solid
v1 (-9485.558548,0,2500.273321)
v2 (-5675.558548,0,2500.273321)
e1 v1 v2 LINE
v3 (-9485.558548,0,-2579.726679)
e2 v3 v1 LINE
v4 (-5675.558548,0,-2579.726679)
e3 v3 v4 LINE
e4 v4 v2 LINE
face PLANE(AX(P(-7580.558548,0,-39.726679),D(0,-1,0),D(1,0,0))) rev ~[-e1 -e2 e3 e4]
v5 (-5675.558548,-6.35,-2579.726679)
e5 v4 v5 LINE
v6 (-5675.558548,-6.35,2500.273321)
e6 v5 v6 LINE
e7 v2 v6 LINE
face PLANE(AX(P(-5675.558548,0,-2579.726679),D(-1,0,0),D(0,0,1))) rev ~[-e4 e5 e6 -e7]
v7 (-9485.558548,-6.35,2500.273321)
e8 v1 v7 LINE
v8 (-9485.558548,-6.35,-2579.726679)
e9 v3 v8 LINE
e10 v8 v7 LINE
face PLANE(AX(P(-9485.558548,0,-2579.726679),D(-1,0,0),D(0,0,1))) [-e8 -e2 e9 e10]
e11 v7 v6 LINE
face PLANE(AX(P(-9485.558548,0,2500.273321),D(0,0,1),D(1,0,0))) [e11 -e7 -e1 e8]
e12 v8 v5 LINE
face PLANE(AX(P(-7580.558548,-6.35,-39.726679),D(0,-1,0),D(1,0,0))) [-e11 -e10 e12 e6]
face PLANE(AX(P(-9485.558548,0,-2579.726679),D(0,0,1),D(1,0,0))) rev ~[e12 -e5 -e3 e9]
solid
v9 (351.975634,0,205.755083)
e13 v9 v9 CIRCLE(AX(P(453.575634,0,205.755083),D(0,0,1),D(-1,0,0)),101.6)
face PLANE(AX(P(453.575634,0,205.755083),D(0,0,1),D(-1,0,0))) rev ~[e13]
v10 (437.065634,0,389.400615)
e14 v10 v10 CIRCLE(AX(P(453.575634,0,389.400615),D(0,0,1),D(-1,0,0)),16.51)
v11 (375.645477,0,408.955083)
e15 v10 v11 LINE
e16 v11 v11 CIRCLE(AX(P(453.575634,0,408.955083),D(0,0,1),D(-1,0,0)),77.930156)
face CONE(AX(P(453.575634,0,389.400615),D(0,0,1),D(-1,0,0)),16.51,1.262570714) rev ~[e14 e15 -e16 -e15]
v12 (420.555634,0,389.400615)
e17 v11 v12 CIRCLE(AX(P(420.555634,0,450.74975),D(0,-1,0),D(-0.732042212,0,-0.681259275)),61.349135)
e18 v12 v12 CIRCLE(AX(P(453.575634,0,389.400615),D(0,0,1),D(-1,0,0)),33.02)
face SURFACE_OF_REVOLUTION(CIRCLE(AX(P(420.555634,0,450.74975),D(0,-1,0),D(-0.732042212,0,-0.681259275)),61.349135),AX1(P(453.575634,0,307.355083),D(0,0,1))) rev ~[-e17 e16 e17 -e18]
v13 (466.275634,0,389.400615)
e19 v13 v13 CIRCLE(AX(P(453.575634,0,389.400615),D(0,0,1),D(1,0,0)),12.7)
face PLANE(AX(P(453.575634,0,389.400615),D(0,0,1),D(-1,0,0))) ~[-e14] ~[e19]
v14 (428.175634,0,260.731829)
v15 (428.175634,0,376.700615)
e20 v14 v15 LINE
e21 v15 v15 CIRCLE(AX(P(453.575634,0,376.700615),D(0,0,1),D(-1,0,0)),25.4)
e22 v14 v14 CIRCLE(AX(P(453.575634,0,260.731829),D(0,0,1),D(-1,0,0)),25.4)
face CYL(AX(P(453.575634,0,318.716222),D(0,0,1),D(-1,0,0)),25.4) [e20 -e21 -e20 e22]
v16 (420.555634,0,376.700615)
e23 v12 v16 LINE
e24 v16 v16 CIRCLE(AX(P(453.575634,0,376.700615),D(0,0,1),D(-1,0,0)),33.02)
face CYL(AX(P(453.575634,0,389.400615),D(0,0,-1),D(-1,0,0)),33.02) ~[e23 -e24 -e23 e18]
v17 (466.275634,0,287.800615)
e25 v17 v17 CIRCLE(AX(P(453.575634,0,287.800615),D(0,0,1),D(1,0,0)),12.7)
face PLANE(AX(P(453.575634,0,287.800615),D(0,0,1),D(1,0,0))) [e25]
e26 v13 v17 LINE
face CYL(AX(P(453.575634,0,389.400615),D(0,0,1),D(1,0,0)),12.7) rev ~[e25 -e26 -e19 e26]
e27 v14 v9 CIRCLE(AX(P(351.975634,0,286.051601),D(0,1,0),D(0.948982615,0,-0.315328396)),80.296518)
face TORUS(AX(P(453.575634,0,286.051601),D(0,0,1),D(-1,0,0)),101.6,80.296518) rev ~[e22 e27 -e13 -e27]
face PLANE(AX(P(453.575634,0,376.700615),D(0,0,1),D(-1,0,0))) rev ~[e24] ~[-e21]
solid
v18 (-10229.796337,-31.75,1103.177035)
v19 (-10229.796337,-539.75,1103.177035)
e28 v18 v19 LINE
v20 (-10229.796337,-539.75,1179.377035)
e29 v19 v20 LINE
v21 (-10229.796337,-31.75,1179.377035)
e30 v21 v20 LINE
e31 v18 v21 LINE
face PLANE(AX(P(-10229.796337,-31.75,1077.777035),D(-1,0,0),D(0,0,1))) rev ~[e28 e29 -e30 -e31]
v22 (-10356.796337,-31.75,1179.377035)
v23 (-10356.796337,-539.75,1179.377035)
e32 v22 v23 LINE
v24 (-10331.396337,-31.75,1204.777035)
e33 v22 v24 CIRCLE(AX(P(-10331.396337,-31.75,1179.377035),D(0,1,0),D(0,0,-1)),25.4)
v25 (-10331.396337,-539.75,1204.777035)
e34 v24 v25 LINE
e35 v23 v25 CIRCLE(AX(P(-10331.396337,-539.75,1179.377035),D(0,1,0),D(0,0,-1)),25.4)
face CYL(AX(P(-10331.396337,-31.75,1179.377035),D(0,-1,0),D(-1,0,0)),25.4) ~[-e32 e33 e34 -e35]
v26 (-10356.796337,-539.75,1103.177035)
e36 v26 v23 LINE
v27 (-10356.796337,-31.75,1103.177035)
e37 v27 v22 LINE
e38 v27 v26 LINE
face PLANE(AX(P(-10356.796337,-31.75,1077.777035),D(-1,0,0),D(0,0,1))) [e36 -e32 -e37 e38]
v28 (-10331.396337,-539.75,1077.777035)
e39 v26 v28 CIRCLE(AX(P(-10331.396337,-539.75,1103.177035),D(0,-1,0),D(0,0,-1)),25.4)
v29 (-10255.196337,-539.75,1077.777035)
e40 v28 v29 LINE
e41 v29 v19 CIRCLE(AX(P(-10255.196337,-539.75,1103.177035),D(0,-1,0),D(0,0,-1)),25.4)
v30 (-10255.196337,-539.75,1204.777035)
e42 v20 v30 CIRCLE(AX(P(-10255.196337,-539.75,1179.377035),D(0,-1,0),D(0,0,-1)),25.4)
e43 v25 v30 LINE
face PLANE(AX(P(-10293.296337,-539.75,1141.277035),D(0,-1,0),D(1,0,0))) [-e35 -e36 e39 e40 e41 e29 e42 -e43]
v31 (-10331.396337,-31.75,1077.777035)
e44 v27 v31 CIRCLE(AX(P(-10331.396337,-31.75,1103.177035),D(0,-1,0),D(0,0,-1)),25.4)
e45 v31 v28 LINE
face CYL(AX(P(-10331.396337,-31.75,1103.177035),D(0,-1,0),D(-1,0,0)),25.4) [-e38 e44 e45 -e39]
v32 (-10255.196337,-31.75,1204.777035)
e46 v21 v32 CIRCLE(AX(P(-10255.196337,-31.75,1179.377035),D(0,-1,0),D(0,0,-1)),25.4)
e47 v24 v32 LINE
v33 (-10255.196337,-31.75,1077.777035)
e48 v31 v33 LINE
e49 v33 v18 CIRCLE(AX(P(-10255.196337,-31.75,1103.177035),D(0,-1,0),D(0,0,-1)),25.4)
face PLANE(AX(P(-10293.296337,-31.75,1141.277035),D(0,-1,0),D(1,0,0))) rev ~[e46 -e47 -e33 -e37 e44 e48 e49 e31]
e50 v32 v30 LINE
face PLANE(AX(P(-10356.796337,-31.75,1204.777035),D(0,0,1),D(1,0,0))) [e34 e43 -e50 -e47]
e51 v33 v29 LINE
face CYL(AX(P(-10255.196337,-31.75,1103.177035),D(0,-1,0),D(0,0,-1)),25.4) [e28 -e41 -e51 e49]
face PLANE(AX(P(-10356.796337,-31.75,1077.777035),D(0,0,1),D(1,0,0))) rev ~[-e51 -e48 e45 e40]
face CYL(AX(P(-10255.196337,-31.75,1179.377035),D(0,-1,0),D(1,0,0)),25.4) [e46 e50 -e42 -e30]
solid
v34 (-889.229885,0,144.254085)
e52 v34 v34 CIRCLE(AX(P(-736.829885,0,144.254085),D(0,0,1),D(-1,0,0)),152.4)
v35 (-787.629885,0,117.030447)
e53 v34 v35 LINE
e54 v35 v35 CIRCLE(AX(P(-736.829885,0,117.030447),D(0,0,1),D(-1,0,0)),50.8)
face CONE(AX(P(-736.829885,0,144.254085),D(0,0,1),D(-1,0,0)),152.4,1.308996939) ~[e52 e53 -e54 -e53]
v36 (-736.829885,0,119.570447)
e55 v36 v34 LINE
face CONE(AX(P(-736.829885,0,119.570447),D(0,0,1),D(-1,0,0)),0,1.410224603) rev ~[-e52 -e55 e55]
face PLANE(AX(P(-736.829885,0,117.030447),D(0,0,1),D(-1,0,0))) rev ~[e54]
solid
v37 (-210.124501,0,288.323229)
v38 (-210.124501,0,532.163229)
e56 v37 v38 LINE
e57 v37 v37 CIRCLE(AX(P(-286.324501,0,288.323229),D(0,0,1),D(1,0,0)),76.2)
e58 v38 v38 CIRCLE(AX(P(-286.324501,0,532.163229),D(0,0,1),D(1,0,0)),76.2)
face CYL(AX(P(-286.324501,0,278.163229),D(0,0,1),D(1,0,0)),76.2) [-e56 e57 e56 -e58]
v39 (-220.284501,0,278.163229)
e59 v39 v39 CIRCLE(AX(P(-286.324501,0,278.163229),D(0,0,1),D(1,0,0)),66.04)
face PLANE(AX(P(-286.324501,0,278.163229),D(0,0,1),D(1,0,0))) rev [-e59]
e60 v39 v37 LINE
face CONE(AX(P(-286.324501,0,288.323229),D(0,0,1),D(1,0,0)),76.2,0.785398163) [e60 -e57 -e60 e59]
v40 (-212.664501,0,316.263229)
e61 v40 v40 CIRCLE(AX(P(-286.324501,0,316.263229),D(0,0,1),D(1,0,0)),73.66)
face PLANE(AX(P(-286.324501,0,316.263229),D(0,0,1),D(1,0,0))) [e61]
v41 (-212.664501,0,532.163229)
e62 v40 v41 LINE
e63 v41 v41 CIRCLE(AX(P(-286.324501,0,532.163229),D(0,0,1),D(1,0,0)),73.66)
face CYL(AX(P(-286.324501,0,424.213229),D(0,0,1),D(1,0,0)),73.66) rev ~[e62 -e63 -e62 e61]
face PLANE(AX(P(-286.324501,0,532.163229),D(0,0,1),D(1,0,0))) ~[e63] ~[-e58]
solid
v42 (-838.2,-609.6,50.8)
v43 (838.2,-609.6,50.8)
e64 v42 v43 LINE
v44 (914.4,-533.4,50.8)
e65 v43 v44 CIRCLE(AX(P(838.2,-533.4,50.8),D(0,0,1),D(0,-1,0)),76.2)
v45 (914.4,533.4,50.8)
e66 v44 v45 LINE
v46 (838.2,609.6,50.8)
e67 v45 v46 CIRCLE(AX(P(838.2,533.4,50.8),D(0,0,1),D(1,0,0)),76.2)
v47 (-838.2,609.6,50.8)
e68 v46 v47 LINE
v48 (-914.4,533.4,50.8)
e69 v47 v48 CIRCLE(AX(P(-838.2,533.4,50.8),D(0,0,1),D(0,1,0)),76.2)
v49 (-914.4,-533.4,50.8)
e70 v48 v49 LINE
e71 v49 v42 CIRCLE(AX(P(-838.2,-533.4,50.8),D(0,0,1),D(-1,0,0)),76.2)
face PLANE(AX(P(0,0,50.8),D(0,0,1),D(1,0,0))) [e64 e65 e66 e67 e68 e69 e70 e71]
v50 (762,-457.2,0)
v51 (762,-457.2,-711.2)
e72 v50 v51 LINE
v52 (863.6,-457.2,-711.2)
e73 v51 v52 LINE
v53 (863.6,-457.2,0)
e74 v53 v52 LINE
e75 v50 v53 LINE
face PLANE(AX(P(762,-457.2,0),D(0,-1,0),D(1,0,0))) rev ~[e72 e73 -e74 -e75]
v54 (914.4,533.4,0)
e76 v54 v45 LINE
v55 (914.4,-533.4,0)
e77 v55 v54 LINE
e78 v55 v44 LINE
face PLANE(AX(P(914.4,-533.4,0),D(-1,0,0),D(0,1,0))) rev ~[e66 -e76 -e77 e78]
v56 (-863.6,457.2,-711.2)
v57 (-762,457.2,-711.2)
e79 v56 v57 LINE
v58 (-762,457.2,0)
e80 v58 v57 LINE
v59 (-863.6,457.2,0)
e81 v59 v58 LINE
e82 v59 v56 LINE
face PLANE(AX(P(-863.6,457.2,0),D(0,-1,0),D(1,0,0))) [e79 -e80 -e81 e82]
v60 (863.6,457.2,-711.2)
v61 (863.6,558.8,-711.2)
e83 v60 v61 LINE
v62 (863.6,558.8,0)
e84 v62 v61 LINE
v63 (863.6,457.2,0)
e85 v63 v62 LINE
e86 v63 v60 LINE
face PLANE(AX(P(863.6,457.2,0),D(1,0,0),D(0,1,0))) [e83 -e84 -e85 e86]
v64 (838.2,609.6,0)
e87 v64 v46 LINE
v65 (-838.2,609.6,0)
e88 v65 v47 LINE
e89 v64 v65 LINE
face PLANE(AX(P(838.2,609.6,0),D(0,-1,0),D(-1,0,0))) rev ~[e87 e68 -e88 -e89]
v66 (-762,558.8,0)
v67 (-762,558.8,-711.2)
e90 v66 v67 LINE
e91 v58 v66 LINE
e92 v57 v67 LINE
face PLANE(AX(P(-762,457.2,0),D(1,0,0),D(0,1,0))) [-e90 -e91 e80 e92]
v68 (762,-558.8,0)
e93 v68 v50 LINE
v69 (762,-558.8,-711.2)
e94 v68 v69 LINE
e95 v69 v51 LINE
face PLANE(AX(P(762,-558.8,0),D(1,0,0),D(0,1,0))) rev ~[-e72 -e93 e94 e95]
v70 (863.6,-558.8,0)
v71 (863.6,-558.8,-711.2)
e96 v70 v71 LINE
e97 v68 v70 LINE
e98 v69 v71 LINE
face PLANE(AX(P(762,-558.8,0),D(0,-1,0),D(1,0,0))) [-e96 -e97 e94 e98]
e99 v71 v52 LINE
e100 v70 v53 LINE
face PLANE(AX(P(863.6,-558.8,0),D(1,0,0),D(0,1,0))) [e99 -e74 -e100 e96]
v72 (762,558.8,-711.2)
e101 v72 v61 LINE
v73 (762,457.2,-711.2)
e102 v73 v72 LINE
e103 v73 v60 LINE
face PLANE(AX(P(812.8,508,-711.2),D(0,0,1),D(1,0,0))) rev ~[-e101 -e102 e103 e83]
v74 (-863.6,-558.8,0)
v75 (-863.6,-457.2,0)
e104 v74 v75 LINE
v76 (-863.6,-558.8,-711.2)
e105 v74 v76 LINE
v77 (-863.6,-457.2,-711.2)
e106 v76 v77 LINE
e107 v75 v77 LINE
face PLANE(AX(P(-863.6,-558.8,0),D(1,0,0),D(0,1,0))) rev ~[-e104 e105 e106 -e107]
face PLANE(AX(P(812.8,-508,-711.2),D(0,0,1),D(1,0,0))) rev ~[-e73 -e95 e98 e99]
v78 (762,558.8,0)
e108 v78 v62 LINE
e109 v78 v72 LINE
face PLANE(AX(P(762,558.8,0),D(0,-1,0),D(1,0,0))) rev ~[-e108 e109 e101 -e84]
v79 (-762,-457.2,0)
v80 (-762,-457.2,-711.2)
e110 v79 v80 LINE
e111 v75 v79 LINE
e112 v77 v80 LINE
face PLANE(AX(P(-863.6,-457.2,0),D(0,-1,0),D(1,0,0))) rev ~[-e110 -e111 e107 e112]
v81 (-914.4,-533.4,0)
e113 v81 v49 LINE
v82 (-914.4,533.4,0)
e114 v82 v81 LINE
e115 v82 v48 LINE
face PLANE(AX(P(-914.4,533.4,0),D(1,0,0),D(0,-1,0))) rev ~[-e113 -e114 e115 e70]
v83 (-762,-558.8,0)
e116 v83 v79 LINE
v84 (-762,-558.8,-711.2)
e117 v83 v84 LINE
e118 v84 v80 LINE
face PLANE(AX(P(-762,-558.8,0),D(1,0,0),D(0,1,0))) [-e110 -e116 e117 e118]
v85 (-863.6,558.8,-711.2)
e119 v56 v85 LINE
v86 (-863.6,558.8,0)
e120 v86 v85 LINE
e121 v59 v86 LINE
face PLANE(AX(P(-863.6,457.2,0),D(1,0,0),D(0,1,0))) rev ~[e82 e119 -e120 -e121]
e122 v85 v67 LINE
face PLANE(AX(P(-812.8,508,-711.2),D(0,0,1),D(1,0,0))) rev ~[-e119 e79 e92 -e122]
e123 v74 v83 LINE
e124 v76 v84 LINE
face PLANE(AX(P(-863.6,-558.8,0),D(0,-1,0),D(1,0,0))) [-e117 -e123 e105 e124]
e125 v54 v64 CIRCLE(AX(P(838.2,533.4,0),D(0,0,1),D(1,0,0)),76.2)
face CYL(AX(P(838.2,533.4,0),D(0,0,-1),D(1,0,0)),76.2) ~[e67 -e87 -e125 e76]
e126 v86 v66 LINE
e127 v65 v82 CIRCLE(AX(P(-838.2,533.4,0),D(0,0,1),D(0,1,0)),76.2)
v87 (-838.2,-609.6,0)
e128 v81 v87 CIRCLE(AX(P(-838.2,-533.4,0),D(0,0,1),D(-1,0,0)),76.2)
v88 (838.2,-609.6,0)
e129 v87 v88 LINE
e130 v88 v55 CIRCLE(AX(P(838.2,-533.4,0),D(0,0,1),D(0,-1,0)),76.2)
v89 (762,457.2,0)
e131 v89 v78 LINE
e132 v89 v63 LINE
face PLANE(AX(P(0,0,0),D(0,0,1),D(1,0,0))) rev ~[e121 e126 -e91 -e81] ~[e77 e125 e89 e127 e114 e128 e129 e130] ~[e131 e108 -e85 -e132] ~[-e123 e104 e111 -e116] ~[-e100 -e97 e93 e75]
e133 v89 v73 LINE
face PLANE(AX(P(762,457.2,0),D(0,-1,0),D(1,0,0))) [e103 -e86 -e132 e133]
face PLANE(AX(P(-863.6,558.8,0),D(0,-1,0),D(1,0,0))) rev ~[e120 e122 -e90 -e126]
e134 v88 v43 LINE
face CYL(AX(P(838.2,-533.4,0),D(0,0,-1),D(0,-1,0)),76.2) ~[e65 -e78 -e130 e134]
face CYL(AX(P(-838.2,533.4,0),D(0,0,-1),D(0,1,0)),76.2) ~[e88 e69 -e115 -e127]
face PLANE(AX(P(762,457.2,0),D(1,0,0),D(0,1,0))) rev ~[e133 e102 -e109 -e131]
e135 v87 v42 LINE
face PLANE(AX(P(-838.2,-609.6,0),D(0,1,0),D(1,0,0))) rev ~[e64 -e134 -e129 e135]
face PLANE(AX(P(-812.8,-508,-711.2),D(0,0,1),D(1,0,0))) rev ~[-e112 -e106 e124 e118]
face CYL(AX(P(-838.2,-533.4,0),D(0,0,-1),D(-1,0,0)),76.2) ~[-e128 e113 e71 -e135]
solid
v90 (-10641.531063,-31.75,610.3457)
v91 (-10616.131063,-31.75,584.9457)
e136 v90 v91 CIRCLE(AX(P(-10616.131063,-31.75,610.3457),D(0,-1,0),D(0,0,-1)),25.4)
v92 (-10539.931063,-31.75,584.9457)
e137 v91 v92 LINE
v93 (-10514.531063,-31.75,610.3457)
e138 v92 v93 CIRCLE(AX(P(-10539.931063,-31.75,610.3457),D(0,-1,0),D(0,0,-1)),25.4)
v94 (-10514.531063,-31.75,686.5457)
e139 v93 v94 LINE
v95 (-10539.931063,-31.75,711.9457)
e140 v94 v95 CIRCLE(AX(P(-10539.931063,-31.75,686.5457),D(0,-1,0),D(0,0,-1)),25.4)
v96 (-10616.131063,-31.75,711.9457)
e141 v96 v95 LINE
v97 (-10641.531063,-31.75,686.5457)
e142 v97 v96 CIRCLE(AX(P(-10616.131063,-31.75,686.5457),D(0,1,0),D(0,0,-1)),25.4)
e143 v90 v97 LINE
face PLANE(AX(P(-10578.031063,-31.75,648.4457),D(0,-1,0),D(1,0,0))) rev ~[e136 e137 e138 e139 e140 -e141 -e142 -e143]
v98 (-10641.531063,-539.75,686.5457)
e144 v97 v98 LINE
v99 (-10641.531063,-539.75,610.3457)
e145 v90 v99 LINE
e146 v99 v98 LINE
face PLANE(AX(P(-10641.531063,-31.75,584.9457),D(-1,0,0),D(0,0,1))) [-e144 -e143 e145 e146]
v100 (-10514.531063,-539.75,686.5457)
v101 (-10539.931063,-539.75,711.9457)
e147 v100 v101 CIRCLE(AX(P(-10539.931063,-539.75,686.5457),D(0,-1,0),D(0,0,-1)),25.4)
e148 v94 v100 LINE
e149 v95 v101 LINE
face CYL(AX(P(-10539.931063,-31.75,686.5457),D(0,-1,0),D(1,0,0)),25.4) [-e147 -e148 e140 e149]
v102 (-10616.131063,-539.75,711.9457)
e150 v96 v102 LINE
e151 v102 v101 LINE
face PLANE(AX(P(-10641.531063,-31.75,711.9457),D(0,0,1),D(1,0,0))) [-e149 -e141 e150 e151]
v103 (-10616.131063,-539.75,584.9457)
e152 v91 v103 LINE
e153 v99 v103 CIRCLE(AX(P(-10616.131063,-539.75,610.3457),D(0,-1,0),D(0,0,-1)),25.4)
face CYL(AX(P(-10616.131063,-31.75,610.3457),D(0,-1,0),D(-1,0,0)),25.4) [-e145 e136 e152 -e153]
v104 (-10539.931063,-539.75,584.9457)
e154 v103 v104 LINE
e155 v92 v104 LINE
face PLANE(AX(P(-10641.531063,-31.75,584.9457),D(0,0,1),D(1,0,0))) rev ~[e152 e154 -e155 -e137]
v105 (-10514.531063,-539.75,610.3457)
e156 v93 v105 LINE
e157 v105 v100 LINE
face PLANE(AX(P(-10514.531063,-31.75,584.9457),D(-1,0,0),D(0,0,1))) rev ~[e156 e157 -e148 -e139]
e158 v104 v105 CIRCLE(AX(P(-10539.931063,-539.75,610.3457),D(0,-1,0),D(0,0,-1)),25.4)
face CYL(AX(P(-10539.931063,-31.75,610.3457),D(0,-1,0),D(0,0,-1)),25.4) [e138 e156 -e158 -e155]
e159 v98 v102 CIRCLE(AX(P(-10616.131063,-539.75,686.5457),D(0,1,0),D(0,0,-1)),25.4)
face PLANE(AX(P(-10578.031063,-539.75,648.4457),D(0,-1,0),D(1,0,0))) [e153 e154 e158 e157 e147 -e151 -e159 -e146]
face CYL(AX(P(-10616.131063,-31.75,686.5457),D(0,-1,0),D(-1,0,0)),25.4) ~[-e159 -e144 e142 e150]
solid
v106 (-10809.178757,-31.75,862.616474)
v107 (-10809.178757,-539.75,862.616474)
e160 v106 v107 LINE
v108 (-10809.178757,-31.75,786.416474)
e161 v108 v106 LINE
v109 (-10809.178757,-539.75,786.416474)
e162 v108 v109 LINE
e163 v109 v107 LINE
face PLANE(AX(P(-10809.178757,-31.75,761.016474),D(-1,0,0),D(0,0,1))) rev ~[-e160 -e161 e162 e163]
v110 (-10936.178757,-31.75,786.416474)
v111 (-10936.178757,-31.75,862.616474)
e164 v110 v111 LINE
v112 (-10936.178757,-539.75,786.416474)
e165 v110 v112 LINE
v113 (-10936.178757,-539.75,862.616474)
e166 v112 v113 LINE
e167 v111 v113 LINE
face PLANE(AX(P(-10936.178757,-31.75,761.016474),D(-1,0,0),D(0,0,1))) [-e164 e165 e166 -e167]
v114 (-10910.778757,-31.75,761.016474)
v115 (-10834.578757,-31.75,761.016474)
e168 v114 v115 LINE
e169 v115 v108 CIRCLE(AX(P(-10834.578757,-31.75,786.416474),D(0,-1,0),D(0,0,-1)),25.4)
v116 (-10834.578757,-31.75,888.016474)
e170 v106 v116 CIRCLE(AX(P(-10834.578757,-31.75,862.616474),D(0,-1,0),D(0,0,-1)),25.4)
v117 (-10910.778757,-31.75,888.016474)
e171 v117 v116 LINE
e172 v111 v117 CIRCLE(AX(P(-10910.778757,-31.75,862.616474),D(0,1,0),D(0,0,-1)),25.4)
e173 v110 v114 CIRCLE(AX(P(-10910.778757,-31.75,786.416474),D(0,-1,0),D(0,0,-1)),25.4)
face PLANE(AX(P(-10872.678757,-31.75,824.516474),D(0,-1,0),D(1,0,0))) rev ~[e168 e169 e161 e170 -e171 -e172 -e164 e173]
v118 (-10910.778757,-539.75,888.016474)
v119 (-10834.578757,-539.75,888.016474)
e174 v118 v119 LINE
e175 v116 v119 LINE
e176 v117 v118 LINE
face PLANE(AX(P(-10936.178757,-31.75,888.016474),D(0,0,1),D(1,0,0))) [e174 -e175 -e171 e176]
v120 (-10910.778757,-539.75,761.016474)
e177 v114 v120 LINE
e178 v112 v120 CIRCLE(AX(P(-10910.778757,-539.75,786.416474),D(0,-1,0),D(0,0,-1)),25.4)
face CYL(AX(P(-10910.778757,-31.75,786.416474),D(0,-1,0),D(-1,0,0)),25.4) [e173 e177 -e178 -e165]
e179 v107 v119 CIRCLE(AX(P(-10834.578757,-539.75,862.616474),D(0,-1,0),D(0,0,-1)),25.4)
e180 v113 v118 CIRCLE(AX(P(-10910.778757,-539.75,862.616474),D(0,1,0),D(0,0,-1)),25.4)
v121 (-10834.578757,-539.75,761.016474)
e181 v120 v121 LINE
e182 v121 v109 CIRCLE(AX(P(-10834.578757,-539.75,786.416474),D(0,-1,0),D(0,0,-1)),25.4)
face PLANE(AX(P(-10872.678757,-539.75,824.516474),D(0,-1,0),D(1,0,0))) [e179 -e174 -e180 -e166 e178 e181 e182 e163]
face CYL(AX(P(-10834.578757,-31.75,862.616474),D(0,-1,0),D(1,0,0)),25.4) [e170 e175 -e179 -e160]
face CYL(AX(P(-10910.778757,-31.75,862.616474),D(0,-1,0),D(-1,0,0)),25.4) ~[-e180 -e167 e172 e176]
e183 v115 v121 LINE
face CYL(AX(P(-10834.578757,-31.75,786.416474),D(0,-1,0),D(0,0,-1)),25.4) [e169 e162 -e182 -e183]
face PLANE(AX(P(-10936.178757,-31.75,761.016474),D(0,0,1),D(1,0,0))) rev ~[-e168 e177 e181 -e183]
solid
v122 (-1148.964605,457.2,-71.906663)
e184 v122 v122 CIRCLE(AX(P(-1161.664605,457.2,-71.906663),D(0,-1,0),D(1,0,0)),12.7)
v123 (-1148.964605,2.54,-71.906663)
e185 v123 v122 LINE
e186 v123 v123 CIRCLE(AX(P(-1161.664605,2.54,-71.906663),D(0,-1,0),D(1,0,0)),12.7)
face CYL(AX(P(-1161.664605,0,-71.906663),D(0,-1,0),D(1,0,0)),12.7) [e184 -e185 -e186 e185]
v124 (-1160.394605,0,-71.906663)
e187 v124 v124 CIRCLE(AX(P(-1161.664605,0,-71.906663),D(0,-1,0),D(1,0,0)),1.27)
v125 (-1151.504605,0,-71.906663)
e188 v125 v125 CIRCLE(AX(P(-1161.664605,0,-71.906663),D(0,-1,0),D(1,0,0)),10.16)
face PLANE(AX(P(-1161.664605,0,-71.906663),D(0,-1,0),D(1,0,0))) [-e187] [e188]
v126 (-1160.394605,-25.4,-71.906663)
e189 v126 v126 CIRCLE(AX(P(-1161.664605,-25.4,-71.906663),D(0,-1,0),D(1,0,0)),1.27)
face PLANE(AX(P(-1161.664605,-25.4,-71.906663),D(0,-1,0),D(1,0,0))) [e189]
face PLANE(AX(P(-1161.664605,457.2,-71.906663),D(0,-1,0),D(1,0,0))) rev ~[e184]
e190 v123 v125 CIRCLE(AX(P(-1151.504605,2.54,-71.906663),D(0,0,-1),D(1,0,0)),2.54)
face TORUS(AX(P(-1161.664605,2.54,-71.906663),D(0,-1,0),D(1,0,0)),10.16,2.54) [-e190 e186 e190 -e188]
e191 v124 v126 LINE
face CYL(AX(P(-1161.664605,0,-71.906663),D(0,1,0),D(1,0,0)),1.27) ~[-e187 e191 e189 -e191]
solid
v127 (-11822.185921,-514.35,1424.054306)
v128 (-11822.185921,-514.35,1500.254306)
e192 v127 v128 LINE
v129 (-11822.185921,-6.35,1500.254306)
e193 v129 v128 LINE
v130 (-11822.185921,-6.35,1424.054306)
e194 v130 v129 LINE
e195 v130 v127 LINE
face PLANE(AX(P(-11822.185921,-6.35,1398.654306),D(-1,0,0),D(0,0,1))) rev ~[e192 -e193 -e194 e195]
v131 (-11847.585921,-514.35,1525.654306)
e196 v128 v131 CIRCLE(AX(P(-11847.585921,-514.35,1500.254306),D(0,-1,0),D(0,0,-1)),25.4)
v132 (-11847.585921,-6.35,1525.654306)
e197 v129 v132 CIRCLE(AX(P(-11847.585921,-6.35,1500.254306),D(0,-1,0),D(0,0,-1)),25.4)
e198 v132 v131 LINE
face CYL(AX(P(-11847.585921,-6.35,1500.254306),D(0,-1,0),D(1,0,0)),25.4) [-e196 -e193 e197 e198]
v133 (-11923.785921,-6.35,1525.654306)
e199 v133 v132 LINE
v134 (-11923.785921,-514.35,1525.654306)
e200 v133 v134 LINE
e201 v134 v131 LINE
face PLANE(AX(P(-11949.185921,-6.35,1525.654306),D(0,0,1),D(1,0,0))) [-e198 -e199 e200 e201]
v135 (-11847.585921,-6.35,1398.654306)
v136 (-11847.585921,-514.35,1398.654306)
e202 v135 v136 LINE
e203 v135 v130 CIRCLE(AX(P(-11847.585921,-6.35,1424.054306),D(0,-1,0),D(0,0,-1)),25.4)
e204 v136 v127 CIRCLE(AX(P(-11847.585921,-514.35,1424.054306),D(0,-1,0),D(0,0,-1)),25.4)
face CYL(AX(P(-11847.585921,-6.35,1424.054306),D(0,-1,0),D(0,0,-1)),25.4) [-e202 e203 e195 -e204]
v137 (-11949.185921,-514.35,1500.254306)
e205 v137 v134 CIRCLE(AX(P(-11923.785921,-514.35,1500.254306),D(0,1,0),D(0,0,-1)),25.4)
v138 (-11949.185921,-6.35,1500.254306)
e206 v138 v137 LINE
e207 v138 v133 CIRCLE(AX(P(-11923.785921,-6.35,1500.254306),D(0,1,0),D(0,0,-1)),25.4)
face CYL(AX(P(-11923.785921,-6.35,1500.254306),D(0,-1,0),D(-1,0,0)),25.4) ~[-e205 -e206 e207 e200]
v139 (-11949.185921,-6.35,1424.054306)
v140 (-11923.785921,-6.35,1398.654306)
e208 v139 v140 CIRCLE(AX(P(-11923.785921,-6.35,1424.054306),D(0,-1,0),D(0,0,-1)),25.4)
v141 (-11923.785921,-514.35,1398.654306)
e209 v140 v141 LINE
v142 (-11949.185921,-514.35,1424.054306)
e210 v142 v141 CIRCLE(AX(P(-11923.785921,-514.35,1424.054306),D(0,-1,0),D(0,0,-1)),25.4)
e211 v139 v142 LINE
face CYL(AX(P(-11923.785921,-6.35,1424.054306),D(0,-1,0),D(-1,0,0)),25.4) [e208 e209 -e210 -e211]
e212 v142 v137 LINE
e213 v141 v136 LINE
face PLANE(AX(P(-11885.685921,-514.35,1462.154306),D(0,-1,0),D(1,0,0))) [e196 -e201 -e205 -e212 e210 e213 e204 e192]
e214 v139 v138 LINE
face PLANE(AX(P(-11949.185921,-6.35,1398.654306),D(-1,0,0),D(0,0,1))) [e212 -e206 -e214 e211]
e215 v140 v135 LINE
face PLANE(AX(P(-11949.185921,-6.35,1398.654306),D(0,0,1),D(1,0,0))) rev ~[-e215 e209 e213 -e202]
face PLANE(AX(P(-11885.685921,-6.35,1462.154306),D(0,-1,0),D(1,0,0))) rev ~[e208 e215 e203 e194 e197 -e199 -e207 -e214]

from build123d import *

# Parameters (mm, degrees)
F0_W      = 101.6
F0_H      = 101.6
F1_DEPTH  = 50.8
F2_DEPTH  = 711.2
F3_W      = 2.54
F3_H      = 215.9
F5_SIZE   = 10.16
F8_R      = 12.7
F8_R_2    = 1.27
F9_DEPTH  = 457.2
F10_DEPTH = 25.4
F11_R     = 2.54
F12_W     = 25.4
F12_H     = 115.9687861614
F14_R     = 12.7
F15_DEPTH = 101.6
F16_W     = 3810
F16_H     = 5080
F17_DEPTH = 6.35
F19_W     = 127
F19_H     = 127
F20_DEPTH = 508
F21_R     = 25.4
F22_W     = 127
F22_H     = 127
F23_DEPTH = 508
F25_W     = 127
F25_H     = 127
F26_DEPTH = 508
F27_R     = 25.4
F28_W     = 127
F28_H     = 127
F29_DEPTH = 508
F30_R     = 25.4
F30_2_R   = 25.4


# Not quite as in the source:
# - a feature of the source that left no trace in its solid (it failed there, or was rolled back) is left out


with BuildPart() as f1:
    # F0 (on Top) → F1 (new body)
    with BuildSketch(Plane.XY):
        with BuildLine():
            Line((838.2, 609.6), (-838.2, 609.6))
            ThreePointArc((-838.2, 609.6), (-892.0815367264, 587.2815367264), (-914.4, 533.4))
            Line((-914.4, 533.4), (-914.4, -533.4))
            ThreePointArc((-914.4, -533.4), (-892.0815367264, -587.2815367264), (-838.2, -609.6))
            Line((-838.2, -609.6), (838.2, -609.6))
            ThreePointArc((838.2, -609.6), (892.0815367264, -587.2815367264), (914.4, -533.4))
            Line((914.4, -533.4), (914.4, 533.4))
            ThreePointArc((914.4, 533.4), (892.0815367264, 587.2815367264), (838.2, 609.6))
        make_face()
        with Locations((-812.8, -508)):
            Rectangle(F0_W, F0_H, mode=Mode.SUBTRACT)
        with Locations((812.8, -508)):
            Rectangle(F0_W, F0_H, mode=Mode.SUBTRACT)
        with Locations((-812.8, 508)):
            Rectangle(F0_W, F0_H, mode=Mode.SUBTRACT)
        with Locations((812.8, 508)):
            Rectangle(F0_W, F0_H, mode=Mode.SUBTRACT)
        with Locations((-812.8, -508)):
            Rectangle(F0_W, F0_H)
        with Locations((812.8, -508)):
            Rectangle(F0_W, F0_H)
        with Locations((812.8, 508)):
            Rectangle(F0_W, F0_H)
        with Locations((-812.8, 508)):
            Rectangle(F0_W, F0_H)
    extrude(amount=F1_DEPTH)

    # F0 (on Top) → F2 (join)
    with BuildSketch(Plane.XY):
        with Locations((-812.8, -508)):
            Rectangle(F0_W, F0_H)
        with Locations((-812.8, 508)):
            Rectangle(F0_W, F0_H)
        with Locations((812.8, 508)):
            Rectangle(F0_W, F0_H)
        with Locations((812.8, -508)):
            Rectangle(F0_W, F0_H)
    extrude(amount=-F2_DEPTH)


with BuildPart() as f4:
    # F3 (on Front) → F4 (revolve)
    with BuildSketch(Plane.XZ):
        Polygon((-286.3245010376, 316.2632285118), (-286.3245010376, 278.1632285118), (-210.1245010376, 278.1632285118), (-210.1245010376, 316.2632285118), (-212.6645010376, 316.2632285118), align=None)
        with Locations((-211.3945010376, 424.2132285118)):
            Rectangle(F3_W, F3_H)
    revolve(axis=Axis((-286.3245010376, 0, 405.1632285118), (0, 0, 1)))

    # F5
    f5_edges = [f4.edges().sort_by_distance(p)[0] for p in [
        (-362.524501, 0, 278.163229),
    ]]
    chamfer(f5_edges, length=F5_SIZE)


with BuildPart() as f7:
    # F6 (on Front) → F7 (revolve)
    with BuildSketch(Plane.XZ):
        Polygon((-787.6298852921, 117.0304474873), (-736.8298852921, 117.0304474873), (-736.8298852921, 119.5704474873), (-889.2298852921, 144.2540854383), align=None)
    revolve(axis=Axis((-736.8298852921, 0, 187.9355122422), (0, 0, 1)))


with BuildPart() as f9:
    # F8 (on Front) → F9 (new body)
    with BuildSketch(Plane.XZ):
        with Locations((-1161.6646051407, -71.9066634774)):
            Circle(F8_R)
        with Locations((-1161.6646051407, -71.9066634774)):
            Circle(F8_R_2, mode=Mode.SUBTRACT)
        with Locations((-1161.6646051407, -71.9066634774)):
            Circle(F8_R_2)
    extrude(amount=-F9_DEPTH)

    # F8 (on Front) → F10 (join)
    with BuildSketch(Plane.XZ):
        with Locations((-1161.6646051407, -71.9066634774)):
            Circle(F8_R_2)
    extrude(amount=F10_DEPTH)

    # F11
    f11_edges = [f9.edges().sort_by_distance(p)[0] for p in [
        (-1174.364605, 0, -71.906663),
    ]]
    fillet(f11_edges, radius=F11_R)


with BuildPart() as f13:
    # F12 (on Front) → F13 (revolve)
    with BuildSketch(Plane.XZ):
        Polygon((428.1756336873, 376.7006152139), (453.5756336873, 376.7006152139), (453.5756336873, 389.4006152139), (437.0656336873, 389.4006152139), (420.5556336873, 389.4006152139), (420.5556336873, 376.7006152139), align=None)
        with Locations((440.8756336873, 318.7162221332)):
            Rectangle(F12_W, F12_H)
        with BuildLine():
            Line((351.9756336873, 205.7550829578), (453.5756336873, 205.7550829578))
            Line((453.5756336873, 205.7550829578), (453.5756336873, 260.7318290524))
            Line((453.5756336873, 260.7318290524), (428.1756336873, 260.7318290524))
            ThreePointArc((428.1756336873, 260.7318290524), (398.9567006482, 220.9339369722), (351.9756336873, 205.7550829578))
        make_face()
        with BuildLine():
            Line((420.5556336873, 389.4006152139), (437.0656336873, 389.4006152139))
            Line((437.0656336873, 389.4006152139), (375.645477209, 408.9550829578))
            ThreePointArc((375.645477209, 408.9550829578), (396.0643119403, 394.5012700165), (420.5556336873, 389.4006152139))
        make_face()
    revolve(axis=Axis((453.5756336873, 0, 307.3550829578), (0, 0, 1)))

    # F14 (on face) → F15 (cut)
    with BuildSketch(Plane.XY.offset(389.4006152139)):
        with Locations((453.5756336873, 0)):
            Circle(F14_R)
    extrude(amount=-F15_DEPTH, mode=Mode.SUBTRACT)


with BuildPart() as f17:
    # F16 (on Front) → F17 (new body)
    with BuildSketch(Plane.XZ):
        with Locations((-7580.5585479736, -39.7266790259)):
            Rectangle(F16_W, F16_H)
    extrude(amount=F17_DEPTH)


with BuildPart() as f20:
    # F19 (on face) → F20 (new body)
    with BuildSketch(Plane.XZ.offset(6.35)):
        with Locations((-11885.6859207153, 1462.1543058495)):
            Rectangle(F19_W, F19_H)
    extrude(amount=F20_DEPTH)

    # F21
    f21_edges = [f20.edges().sort_by_distance(p)[0] for p in [
        (-11822.185921, -260.35, 1525.654306),
        (-11949.185921, -260.35, 1525.654306),
        (-11949.185921, -260.35, 1398.654306),
        (-11822.185921, -260.35, 1398.654306),
    ]]
    fillet(f21_edges, radius=F21_R)


with BuildPart() as f23:
    # F22 (on offset) → F23 (new body)
    with BuildSketch(Plane.XZ.offset(31.75)):
        with Locations((-10293.2963371277, 1141.2770350553)):
            Rectangle(F22_W, F22_H)
    extrude(amount=F23_DEPTH)

    # F30#2
    f30_2_edges = [f23.edges().sort_by_distance(p)[0] for p in [
        (-10229.796337, -285.75, 1204.777035),
        (-10356.796337, -285.75, 1204.777035),
        (-10356.796337, -285.75, 1077.777035),
        (-10229.796337, -285.75, 1077.777035),
    ]]
    fillet(f30_2_edges, radius=F30_2_R)


with BuildPart() as f26:
    # F25 (on offset) → F26 (new body)
    with BuildSketch(Plane.XZ.offset(31.75)):
        with Locations((-10872.6787567139, 824.5164741749)):
            Rectangle(F25_W, F25_H)
    extrude(amount=F26_DEPTH)

    # F27
    f27_edges = [f26.edges().sort_by_distance(p)[0] for p in [
        (-10809.178757, -285.75, 761.016474),
        (-10809.178757, -285.75, 888.016474),
        (-10936.178757, -285.75, 888.016474),
        (-10936.178757, -285.75, 761.016474),
    ]]
    fillet(f27_edges, radius=F27_R)


with BuildPart() as f29:
    # F28 (on offset) → F29 (new body)
    with BuildSketch(Plane.XZ.offset(31.75)):
        with Locations((-10578.0310630798, 648.4456999137)):
            Rectangle(F28_W, F28_H)
    extrude(amount=F29_DEPTH)

    # F30
    f30_edges = [f29.edges().sort_by_distance(p)[0] for p in [
        (-10514.531063, -285.75, 711.9457),
        (-10641.531063, -285.75, 711.9457),
        (-10641.531063, -285.75, 584.9457),
        (-10514.531063, -285.75, 584.9457),
    ]]
    fillet(f30_edges, radius=F30_R)


solid = Compound([f1.part, f4.part, f7.part, f9.part, f13.part, f17.part, f20.part, f23.part, f26.part, f29.part])
